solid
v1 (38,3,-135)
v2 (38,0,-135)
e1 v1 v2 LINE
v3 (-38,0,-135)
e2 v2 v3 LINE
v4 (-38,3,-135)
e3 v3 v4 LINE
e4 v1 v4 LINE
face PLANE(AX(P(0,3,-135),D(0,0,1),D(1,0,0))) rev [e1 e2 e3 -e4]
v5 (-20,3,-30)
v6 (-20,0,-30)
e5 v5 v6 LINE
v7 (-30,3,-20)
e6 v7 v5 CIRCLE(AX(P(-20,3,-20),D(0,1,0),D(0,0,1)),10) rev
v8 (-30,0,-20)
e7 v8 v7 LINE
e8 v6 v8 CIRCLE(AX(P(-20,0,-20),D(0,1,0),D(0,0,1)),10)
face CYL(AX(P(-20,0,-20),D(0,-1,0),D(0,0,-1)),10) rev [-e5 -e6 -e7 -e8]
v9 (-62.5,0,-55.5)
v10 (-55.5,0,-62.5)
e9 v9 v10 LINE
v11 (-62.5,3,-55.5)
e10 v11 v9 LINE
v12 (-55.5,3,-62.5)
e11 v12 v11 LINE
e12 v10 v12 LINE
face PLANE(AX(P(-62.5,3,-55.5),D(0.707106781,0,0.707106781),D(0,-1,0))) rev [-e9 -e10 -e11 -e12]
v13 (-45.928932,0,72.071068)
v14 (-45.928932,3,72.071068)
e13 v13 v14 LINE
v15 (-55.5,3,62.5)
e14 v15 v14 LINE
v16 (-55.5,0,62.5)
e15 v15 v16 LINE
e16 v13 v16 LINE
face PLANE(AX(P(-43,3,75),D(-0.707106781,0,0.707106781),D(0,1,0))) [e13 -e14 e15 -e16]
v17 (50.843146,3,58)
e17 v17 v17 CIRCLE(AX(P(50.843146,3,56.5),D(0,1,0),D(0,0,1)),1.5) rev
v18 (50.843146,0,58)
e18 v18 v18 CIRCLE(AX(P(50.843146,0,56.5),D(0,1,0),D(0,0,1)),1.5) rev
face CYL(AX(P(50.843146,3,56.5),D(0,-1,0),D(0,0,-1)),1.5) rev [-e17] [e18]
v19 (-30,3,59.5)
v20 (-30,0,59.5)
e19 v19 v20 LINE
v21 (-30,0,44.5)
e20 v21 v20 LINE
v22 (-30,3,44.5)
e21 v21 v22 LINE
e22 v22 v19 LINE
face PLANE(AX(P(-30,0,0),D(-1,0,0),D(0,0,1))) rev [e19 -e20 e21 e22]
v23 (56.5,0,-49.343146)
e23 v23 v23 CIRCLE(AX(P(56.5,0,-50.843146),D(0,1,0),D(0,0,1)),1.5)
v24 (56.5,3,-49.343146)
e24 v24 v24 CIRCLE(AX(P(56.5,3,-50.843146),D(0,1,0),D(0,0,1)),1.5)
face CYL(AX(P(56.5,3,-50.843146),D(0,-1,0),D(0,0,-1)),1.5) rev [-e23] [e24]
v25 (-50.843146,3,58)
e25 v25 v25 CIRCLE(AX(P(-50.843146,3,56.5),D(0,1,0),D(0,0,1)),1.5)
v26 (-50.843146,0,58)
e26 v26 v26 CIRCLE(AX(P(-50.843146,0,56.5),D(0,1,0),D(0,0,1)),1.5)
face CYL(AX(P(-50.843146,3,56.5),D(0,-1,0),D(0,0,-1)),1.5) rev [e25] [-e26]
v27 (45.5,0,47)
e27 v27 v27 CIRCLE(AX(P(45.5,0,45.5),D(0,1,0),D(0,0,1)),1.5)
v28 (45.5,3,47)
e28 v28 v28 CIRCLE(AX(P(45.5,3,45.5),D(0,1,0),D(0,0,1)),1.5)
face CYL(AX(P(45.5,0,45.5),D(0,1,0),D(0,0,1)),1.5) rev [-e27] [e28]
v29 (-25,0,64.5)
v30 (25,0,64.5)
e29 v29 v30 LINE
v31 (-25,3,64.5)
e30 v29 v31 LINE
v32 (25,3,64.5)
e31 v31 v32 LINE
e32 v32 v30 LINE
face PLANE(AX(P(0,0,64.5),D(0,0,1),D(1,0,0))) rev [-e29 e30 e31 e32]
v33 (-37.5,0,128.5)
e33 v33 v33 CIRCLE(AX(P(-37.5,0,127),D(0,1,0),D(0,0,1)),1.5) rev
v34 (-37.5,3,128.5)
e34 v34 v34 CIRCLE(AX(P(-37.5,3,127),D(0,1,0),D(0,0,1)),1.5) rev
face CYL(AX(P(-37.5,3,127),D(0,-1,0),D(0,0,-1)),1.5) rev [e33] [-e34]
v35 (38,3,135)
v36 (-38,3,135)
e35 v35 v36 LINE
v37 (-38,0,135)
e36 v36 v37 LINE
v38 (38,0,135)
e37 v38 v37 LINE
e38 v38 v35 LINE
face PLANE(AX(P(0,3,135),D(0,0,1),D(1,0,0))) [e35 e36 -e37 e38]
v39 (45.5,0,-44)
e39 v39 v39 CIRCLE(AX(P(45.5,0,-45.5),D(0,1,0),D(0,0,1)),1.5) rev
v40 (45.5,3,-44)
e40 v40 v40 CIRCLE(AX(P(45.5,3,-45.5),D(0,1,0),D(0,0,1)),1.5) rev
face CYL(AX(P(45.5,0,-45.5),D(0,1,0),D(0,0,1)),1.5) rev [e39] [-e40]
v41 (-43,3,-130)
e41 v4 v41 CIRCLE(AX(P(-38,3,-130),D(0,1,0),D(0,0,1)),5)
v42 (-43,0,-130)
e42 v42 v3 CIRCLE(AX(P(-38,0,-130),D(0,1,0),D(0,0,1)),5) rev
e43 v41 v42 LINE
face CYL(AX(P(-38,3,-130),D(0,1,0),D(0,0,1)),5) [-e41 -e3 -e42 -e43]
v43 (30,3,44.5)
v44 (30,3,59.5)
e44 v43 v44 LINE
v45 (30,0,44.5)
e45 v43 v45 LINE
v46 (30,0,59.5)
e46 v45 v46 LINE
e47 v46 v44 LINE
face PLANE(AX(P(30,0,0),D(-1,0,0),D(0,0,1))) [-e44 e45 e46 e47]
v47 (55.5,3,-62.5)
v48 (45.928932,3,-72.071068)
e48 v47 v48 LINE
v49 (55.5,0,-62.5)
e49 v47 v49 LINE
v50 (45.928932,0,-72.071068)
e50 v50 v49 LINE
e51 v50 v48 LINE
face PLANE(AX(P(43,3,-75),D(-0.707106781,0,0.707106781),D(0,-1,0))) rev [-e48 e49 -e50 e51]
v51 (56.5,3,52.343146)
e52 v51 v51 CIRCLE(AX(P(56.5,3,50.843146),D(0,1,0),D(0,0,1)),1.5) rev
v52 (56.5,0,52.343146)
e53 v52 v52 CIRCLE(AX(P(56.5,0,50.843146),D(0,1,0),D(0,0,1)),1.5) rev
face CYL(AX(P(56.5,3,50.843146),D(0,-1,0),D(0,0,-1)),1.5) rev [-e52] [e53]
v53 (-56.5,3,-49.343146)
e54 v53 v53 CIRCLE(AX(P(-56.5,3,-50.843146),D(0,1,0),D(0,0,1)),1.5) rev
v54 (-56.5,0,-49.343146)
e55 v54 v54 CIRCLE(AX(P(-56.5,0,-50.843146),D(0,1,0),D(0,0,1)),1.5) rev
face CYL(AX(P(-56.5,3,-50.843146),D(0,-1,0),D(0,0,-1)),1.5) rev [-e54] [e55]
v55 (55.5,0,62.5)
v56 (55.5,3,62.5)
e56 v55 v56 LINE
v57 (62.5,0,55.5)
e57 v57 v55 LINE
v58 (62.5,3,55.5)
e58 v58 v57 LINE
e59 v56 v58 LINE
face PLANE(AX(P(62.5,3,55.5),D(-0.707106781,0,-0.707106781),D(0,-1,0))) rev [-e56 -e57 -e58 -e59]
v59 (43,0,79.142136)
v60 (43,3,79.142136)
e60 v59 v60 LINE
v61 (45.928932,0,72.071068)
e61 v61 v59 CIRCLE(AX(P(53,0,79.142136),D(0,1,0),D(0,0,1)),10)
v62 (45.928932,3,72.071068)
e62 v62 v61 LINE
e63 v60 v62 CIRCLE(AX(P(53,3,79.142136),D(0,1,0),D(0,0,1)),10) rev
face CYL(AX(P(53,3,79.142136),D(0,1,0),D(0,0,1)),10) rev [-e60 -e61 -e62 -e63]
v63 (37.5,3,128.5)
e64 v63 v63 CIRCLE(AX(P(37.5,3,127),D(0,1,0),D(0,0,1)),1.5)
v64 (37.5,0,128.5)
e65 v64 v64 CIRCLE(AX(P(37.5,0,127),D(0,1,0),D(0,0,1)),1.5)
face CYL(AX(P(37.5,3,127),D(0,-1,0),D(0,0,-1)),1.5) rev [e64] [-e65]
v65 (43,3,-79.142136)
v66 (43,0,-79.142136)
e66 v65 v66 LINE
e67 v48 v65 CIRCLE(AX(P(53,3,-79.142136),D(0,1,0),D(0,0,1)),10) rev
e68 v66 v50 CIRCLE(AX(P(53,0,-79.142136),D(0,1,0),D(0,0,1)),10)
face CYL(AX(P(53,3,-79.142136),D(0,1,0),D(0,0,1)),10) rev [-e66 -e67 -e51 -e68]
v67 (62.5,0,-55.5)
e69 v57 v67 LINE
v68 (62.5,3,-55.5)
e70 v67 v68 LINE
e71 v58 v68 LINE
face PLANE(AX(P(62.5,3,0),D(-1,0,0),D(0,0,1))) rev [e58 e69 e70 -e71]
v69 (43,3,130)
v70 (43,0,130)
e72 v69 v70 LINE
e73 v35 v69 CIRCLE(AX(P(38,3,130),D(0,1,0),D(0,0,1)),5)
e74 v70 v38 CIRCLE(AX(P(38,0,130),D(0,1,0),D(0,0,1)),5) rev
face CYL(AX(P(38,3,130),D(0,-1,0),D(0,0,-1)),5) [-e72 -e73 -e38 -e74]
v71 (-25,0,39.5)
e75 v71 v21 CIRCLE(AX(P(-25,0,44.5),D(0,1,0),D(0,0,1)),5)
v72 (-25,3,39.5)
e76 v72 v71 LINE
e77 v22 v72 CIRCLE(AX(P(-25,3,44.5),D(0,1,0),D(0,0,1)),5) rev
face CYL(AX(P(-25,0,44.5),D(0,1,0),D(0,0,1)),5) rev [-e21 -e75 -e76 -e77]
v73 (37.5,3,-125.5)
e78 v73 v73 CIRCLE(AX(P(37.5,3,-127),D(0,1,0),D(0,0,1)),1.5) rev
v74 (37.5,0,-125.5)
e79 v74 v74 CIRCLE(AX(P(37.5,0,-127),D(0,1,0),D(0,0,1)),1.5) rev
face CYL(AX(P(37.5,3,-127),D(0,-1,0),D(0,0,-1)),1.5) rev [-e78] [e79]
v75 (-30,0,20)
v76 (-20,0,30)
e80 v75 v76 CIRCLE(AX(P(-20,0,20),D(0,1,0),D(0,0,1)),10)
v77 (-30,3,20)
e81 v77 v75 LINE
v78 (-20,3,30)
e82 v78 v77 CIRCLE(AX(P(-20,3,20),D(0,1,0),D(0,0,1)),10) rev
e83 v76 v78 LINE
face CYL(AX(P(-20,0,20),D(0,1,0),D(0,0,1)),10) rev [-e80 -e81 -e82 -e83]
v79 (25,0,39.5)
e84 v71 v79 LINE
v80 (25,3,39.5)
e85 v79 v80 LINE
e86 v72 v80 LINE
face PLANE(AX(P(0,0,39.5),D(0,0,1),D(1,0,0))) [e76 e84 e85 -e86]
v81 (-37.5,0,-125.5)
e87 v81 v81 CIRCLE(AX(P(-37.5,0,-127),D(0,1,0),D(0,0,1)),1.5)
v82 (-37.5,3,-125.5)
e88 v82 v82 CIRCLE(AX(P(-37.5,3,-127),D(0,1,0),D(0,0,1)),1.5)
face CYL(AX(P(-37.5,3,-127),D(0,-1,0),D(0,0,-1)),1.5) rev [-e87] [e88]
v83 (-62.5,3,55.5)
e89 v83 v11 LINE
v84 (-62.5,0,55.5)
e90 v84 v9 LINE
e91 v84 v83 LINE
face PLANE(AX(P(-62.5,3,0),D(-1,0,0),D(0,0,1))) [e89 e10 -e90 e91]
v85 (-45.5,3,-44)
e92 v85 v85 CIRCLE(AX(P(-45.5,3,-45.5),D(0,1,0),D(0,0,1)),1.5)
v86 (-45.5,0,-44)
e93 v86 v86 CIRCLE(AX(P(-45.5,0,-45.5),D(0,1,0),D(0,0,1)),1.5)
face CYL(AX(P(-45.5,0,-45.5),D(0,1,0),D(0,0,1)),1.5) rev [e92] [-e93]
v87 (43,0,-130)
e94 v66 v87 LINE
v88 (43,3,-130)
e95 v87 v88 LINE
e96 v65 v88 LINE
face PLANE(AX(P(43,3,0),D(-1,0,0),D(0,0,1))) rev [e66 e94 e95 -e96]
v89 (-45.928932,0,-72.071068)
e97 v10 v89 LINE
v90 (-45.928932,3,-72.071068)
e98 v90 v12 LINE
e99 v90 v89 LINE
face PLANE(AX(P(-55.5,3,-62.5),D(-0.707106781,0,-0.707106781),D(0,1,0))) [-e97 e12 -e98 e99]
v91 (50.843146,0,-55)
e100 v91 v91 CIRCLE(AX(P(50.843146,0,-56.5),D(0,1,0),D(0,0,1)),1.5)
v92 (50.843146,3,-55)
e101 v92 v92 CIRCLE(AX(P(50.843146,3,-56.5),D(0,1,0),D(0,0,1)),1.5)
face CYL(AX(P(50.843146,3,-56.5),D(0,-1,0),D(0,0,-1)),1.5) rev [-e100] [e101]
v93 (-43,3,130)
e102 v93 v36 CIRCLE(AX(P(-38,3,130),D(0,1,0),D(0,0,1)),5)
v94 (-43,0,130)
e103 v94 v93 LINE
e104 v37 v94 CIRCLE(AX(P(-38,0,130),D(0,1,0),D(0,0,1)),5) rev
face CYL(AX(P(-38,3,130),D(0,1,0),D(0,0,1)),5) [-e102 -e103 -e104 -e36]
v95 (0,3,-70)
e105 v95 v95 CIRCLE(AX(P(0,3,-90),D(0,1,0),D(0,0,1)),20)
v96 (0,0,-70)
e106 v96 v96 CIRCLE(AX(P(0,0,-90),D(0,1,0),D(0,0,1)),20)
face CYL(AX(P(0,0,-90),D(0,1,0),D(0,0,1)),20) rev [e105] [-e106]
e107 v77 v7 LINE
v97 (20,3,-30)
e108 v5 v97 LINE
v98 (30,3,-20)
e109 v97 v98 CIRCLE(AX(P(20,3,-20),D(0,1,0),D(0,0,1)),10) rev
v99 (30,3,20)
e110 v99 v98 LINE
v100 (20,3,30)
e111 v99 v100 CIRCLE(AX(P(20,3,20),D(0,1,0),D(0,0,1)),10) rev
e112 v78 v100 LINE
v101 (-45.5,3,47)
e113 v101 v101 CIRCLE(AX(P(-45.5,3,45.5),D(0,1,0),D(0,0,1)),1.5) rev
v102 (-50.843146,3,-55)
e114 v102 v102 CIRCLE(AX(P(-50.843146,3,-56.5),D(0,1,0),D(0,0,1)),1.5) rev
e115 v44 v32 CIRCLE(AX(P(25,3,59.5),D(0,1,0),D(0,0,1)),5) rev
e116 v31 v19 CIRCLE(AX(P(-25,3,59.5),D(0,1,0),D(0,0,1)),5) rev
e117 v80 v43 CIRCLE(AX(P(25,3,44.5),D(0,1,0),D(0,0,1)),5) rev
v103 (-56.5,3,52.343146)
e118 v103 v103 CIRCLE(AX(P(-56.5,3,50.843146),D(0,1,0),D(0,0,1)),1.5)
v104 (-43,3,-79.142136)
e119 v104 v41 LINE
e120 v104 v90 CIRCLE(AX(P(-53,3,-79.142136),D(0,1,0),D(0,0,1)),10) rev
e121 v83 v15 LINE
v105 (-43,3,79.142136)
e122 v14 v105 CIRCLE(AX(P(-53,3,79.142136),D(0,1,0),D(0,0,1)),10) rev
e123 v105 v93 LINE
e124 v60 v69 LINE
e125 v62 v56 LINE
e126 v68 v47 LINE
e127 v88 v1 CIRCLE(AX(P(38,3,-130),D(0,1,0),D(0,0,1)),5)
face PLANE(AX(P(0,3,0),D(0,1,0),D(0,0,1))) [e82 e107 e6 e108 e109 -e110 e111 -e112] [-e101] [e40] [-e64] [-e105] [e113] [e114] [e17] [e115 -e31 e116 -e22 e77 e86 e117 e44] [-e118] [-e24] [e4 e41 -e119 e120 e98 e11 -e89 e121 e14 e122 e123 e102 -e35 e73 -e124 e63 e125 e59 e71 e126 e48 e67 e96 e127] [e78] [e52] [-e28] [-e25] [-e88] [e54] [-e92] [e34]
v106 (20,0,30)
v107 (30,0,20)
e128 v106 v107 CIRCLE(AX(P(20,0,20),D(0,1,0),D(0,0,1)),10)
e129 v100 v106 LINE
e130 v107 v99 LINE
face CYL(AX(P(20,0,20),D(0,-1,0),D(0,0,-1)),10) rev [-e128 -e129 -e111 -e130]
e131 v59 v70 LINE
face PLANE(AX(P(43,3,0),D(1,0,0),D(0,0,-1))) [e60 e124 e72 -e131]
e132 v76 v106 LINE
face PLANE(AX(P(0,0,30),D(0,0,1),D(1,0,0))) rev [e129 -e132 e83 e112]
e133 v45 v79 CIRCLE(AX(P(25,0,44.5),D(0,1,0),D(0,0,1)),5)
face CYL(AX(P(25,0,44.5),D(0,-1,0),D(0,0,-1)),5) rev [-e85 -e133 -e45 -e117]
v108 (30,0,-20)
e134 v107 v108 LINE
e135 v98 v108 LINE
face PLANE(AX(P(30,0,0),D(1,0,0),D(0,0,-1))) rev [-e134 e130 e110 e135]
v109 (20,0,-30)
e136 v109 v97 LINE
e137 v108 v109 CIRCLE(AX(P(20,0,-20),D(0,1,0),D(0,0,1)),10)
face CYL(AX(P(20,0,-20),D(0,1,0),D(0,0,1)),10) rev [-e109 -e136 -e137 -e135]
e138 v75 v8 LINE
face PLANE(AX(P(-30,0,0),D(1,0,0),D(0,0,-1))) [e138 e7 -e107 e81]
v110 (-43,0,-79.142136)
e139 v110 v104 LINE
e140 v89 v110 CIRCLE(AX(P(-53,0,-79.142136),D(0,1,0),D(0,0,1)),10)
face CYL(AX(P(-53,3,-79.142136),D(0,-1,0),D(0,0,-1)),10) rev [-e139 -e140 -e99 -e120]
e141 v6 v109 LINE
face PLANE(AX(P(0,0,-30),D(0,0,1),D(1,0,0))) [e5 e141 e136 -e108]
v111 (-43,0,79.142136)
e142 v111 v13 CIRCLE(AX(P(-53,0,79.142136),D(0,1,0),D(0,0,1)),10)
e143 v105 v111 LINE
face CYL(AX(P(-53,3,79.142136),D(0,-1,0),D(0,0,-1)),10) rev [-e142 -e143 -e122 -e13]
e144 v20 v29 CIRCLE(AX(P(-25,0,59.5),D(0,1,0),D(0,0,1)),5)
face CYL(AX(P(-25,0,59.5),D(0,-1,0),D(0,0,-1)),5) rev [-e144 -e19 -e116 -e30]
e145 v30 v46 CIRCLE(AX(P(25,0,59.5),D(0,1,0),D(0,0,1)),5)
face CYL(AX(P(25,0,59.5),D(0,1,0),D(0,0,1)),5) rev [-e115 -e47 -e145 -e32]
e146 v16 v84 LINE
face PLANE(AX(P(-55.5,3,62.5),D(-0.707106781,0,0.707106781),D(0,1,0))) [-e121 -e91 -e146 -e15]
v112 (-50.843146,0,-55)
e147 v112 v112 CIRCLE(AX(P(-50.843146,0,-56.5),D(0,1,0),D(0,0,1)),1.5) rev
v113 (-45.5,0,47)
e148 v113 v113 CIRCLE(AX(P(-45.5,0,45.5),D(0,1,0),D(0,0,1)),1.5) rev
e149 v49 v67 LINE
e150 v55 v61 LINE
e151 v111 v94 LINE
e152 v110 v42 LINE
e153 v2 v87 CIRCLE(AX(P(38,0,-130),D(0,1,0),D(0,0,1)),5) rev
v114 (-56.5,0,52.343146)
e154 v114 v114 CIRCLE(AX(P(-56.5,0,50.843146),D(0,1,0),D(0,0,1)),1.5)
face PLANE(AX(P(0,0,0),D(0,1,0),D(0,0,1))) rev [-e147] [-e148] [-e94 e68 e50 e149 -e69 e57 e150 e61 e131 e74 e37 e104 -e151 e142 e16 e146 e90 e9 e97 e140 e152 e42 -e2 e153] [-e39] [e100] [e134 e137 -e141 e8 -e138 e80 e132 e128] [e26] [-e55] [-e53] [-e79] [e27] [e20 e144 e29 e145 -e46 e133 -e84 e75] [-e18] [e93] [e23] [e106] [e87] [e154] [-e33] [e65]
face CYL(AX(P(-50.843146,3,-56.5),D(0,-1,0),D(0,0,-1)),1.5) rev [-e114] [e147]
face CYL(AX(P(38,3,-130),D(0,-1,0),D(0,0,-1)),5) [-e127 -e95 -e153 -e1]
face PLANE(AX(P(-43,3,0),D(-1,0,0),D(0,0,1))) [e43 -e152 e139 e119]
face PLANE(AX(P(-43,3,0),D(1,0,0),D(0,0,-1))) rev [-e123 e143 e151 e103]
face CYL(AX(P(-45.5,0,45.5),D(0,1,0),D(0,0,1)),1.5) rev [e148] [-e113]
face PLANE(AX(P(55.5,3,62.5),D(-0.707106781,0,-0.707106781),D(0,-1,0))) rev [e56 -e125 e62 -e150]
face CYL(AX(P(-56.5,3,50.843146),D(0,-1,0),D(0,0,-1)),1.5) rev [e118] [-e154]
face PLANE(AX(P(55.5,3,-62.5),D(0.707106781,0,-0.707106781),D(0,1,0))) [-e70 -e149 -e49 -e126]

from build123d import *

# Parameters (mm, degrees)
SKETCH_1_R          = 1.5
EXTRUDE_1_DEPTH     = 3
CHAMFER_1_SIZE      = 7
SKETCH_3_W          = 60
SKETCH_3_H          = 60
SKETCH_3_R          = 1.5
SKETCH_3_R_2        = 20
SKETCH_3_H_2        = 10
SKETCH_3_H_3        = 5
CUT_EXTRUDE_1_DEPTH = 3
FILLET_3_R          = 10
FILLET_4_R          = 5
FILLET_5_R          = 5
CHAMFER_2_SIZE      = 12.5
FILLET_6_R          = 10


with BuildPart() as part:
    # 草图1 → 凸台-拉伸1 (new body)
    with BuildSketch(Plane(origin=(0, 0, 0), x_dir=(1, 0, 0), z_dir=(0, 1, 0))):
        Polygon((-62.5, 62.5), (-62.5, -62.5), (-43, -62.5), (-43, -135), (43, -135), (43, -62.5), (62.5, -62.5), (62.5, 62.5), (43, 62.5), (43, 135), (-43, 135), (-43, 62.5), align=None)
        with Locations(Location((-56.5, -50.843145751, 0), (0, 0, 270))):
            Circle(SKETCH_1_R, mode=Mode.SUBTRACT)
        with Locations(Location((-50.843145751, -56.5, 0), (0, 0, 270))):
            Circle(SKETCH_1_R, mode=Mode.SUBTRACT)
        with Locations(Location((50.843145751, -56.5, 0), (0, 0, 270))):
            Circle(SKETCH_1_R, mode=Mode.SUBTRACT)
        with Locations(Location((56.5, -50.843145751, 0), (0, 0, 270))):
            Circle(SKETCH_1_R, mode=Mode.SUBTRACT)
        with Locations(Location((-56.5, 50.843145751, 0), (0, 0, 270))):
            Circle(SKETCH_1_R, mode=Mode.SUBTRACT)
        with Locations(Location((-50.843145751, 56.5, 0), (0, 0, 270))):
            Circle(SKETCH_1_R, mode=Mode.SUBTRACT)
        with Locations(Location((50.843145751, 56.5, 0), (0, 0, 270))):
            Circle(SKETCH_1_R, mode=Mode.SUBTRACT)
        with Locations(Location((56.5, 50.843145751, 0), (0, 0, 270))):
            Circle(SKETCH_1_R, mode=Mode.SUBTRACT)
        with Locations(Location((37.5, -127, 0), (0, 0, 270))):
            Circle(SKETCH_1_R, mode=Mode.SUBTRACT)
        with Locations(Location((-37.5, -127, 0), (0, 0, 270))):
            Circle(SKETCH_1_R, mode=Mode.SUBTRACT)
        with Locations(Location((37.5, 127, 0), (0, 0, 270))):
            Circle(SKETCH_1_R, mode=Mode.SUBTRACT)
        with Locations(Location((-37.5, 127, 0), (0, 0, 270))):
            Circle(SKETCH_1_R, mode=Mode.SUBTRACT)
    extrude(amount=EXTRUDE_1_DEPTH)

    # 倒角1
    chamfer_1_edges = [part.edges().sort_by_distance(p)[0] for p in [
        (-62.5, 1.5, 62.5),
        (-62.5, 1.5, -62.5),
        (62.5, 1.5, -62.5),
        (62.5, 1.5, 62.5),
    ]]
    chamfer(chamfer_1_edges, length=CHAMFER_1_SIZE)

    # 草图3 → 切除-拉伸1 (cut)
    with BuildSketch(Plane(origin=(0, 3, 0), x_dir=(1, 0, 0), z_dir=(0, 1, 0))):
        Rectangle(SKETCH_3_W, SKETCH_3_H)
        with Locations(Location((-45.5, 45.5, 0), (0, 0, 270))):
            Circle(SKETCH_3_R)
        with Locations(Location((45.5, 45.5, 0), (0, 0, 270))):
            Circle(SKETCH_3_R)
        with Locations(Location((45.5, -45.5, 0), (0, 0, 270))):
            Circle(SKETCH_3_R)
        with Locations(Location((-45.5, -45.5, 0), (0, 0, 270))):
            Circle(SKETCH_3_R)
        with Locations(Location((0, 90, 0), (0, 0, 270))):
            Circle(SKETCH_3_R_2)
        with Locations((0, -44.5)):
            Rectangle(SKETCH_3_W, SKETCH_3_H_2)
        with Locations((0, -54.5)):
            Rectangle(SKETCH_3_W, SKETCH_3_H_2)
        with Locations((0, -62)):
            Rectangle(SKETCH_3_W, SKETCH_3_H_3)
    extrude(amount=-CUT_EXTRUDE_1_DEPTH, mode=Mode.SUBTRACT)

    # 圆角3
    fillet_3_edges = [part.edges().sort_by_distance(p)[0] for p in [
        (30, 1.5, 30),
        (-30, 1.5, 30),
        (-30, 1.5, -30),
        (30, 1.5, -30),
    ]]
    fillet(fillet_3_edges, radius=FILLET_3_R)

    # 圆角4
    fillet_4_edges = [part.edges().sort_by_distance(p)[0] for p in [
        (-43, 1.5, -135),
        (43, 1.5, -135),
        (43, 1.5, 135),
        (-43, 1.5, 135),
    ]]
    fillet(fillet_4_edges, radius=FILLET_4_R)

    # 圆角5
    fillet_5_edges = [part.edges().sort_by_distance(p)[0] for p in [
        (30, 1.5, 39.5),
        (30, 1.5, 64.5),
        (-30, 1.5, 64.5),
        (-30, 1.5, 39.5),
    ]]
    fillet(fillet_5_edges, radius=FILLET_5_R)

    # 倒角2
    chamfer_2_edges = [part.edges().sort_by_distance(p)[0] for p in [
        (43, 1.5, -62.5),
        (-43, 1.5, -62.5),
        (43, 1.5, 62.5),
        (-43, 1.5, 62.5),
    ]]
    chamfer(chamfer_2_edges, length=CHAMFER_2_SIZE - 0.0001)  # a hair under: the kernel refuses the full size

    # 圆角6
    fillet_6_edges = [part.edges().sort_by_distance(p)[0] for p in [
        (43, 1.5, -74.9999),
        (-43, 1.5, -74.9999),
        (43, 1.5, 74.9999),
        (-43, 1.5, 74.9999),
    ]]
    fillet(fillet_6_edges, radius=FILLET_6_R)


solid = part.part
